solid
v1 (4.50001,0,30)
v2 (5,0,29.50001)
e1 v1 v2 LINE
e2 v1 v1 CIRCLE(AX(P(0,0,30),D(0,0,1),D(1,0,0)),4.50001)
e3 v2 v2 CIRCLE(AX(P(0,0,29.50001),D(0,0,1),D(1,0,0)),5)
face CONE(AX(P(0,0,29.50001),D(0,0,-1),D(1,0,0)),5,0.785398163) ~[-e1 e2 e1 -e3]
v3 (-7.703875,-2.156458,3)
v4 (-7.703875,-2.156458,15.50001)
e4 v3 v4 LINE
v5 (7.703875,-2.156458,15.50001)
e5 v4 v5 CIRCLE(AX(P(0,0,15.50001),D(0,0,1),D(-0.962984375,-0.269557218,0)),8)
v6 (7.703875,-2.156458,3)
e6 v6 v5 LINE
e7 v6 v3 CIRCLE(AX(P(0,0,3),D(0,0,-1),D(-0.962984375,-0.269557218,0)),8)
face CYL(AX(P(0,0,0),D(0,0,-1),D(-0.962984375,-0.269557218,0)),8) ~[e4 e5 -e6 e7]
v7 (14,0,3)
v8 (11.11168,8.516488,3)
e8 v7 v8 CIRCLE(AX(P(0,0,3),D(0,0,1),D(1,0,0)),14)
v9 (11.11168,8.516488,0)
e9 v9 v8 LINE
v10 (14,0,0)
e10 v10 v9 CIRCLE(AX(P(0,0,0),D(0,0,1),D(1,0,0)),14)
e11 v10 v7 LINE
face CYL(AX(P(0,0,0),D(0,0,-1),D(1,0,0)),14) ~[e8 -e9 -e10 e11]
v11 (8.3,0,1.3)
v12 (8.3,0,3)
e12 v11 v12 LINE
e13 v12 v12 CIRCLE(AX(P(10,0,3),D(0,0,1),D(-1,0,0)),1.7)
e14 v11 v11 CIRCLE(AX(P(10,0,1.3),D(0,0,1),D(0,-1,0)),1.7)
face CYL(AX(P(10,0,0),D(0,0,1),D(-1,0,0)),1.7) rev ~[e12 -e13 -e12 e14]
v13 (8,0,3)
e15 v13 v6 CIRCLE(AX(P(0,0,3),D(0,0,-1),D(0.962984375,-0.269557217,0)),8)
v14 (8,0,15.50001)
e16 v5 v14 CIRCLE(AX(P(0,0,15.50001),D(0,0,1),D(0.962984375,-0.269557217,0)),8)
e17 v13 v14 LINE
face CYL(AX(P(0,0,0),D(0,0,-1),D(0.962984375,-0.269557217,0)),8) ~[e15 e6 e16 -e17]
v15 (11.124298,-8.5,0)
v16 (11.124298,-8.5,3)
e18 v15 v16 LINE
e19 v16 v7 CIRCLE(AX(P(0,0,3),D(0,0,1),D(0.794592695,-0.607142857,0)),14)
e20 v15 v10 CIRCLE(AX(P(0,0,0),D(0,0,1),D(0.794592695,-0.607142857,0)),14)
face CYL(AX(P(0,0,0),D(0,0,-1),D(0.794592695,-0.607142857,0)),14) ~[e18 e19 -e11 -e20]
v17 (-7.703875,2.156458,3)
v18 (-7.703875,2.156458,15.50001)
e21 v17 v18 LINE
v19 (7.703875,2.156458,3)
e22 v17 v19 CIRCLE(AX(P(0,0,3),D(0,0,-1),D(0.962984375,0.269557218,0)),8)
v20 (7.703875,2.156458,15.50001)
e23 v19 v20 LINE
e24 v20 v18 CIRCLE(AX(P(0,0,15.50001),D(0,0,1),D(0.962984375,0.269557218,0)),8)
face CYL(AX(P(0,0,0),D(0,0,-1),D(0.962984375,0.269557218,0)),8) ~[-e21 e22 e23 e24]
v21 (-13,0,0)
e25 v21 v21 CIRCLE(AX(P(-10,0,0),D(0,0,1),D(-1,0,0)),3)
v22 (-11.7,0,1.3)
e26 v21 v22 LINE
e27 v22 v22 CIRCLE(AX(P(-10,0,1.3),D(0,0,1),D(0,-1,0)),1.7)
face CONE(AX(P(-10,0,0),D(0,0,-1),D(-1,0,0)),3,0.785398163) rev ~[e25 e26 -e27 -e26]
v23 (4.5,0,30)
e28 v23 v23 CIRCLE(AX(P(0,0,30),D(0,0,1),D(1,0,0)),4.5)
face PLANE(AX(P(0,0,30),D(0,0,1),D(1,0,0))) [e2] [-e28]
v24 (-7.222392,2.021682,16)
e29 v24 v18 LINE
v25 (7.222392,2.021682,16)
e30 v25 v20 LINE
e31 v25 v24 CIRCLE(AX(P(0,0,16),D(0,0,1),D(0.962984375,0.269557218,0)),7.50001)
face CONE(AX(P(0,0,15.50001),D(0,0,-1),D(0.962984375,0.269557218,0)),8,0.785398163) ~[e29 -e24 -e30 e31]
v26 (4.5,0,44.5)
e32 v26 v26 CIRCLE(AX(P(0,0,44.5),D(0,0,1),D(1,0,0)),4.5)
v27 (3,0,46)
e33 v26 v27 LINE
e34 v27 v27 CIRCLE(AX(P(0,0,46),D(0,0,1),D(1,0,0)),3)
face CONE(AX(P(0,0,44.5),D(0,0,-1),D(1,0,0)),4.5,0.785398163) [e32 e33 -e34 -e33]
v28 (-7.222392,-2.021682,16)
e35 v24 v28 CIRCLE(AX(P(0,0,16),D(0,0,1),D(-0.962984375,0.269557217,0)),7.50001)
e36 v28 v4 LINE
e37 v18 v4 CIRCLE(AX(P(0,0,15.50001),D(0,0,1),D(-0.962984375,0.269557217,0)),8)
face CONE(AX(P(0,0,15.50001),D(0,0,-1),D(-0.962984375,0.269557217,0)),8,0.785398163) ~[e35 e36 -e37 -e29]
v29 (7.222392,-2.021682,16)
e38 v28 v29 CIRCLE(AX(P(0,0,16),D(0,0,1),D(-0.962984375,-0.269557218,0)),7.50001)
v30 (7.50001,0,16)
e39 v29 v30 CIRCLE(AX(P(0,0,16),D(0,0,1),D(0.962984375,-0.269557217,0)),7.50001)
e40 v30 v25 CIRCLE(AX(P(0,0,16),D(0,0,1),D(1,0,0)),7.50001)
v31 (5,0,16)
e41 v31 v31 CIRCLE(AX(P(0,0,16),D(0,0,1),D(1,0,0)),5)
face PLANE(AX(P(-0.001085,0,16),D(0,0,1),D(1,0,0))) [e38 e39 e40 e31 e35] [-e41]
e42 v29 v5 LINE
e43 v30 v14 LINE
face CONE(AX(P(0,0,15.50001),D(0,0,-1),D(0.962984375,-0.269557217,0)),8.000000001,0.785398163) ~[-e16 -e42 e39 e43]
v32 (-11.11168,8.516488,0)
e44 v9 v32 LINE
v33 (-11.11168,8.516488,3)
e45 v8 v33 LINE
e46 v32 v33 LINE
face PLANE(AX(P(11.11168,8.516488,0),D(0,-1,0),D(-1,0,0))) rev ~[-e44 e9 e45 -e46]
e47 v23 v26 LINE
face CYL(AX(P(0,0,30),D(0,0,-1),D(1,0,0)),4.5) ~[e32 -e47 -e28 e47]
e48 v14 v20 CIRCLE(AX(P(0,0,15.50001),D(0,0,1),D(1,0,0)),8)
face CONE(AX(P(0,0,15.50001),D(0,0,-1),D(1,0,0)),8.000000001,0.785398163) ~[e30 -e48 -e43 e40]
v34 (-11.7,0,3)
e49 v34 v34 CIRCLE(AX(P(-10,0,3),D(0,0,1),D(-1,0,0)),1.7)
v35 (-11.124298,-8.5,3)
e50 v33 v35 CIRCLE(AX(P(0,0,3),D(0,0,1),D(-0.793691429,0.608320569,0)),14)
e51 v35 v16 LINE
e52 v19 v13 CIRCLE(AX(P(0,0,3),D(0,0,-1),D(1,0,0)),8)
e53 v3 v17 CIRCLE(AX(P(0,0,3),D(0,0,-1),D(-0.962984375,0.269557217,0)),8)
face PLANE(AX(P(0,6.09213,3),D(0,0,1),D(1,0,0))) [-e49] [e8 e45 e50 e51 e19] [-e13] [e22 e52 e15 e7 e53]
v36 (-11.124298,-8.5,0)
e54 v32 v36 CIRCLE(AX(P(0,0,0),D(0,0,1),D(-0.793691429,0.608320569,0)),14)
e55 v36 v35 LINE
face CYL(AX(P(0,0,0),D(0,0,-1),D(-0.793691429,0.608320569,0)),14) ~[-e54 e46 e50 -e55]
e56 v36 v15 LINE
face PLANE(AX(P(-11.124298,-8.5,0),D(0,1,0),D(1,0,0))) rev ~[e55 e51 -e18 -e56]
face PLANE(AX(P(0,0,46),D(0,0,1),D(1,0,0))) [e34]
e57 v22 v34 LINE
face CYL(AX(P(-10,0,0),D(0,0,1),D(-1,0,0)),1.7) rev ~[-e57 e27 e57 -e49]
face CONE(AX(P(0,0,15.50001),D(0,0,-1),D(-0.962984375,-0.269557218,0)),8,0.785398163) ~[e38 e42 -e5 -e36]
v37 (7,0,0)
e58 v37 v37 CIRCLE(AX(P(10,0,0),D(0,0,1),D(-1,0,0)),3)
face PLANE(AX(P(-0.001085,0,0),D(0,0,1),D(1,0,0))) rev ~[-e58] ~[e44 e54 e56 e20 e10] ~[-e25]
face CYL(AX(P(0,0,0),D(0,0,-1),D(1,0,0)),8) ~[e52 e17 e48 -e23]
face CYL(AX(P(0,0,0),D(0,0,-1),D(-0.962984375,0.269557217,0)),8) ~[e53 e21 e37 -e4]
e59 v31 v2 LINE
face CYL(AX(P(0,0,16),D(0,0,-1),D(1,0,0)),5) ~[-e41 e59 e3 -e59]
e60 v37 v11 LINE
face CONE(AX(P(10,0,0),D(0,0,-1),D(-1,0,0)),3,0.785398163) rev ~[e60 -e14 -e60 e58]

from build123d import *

# Parameters (mm, degrees)
F1_DEPTH        = 3
F2_DEPTH        = 16
F3_R            = 5
F4_DEPTH        = 14
F5_R            = 4.5
F6_DEPTH        = 16
F7_SIZE         = 1.5
F8_SIZE         = 0.49999
F9_D            = 3.4
F9_CSINK_D      = 6
F9_CSINK_ANGLE  = 90
F10_D           = 3.4
F10_CSINK_D     = 6
F10_CSINK_ANGLE = 90


# Not quite as in the source:
# - a fillet or chamfer is up to 0.001 mm smaller than in the source, because OpenCascade refuses the exact size


with BuildPart() as f1:
    # F0 (on Top) → F1 (new body)
    with BuildSketch(Plane.XY):
        with BuildLine():
            ThreePointArc((9.503875, 3.1106848096), (7.8523539336, 6.1919736516), (5.2411289459, 8.5164879717))
            Line((5.2411289459, 8.5164879717), (-5.2411289459, 8.5164879717))
            ThreePointArc((-5.2411289459, 8.5164879717), (-7.8523539336, 6.1919736516), (-9.503875, 3.1106848096))
            ThreePointArc((-9.503875, 3.1106848096), (-8.5246009554, 2.7831093509), (-7.703875, 2.15645774))
            ThreePointArc((-7.703875, 2.15645774), (0, 8), (7.703875, 2.15645774))
            ThreePointArc((7.703875, 2.15645774), (8.5246009554, 2.7831093509), (9.503875, 3.1106848096))
        make_face()
        with BuildLine():
            ThreePointArc((-7.703875, 2.15645774), (-8.5246009554, 2.7831093509), (-9.503875, 3.1106848096))
            ThreePointArc((-9.503875, 3.1106848096), (-9.705576078, 2.4086911373), (-9.8555, 1.6938476171))
            ThreePointArc((-9.8555, 1.6938476171), (-8.7478718117, 1.149858687), (-8.3, 0))
            ThreePointArc((-8.3, 0), (-8.7478718117, -1.149858687), (-9.8555, -1.6938476171))
            ThreePointArc((-9.8555, -1.6938476171), (-9.705576078, -2.4086911373), (-9.503875, -3.1106848096))
            ThreePointArc((-9.503875, -3.1106848096), (-8.5246009554, -2.7831093509), (-7.703875, -2.15645774))
            ThreePointArc((-7.703875, -2.15645774), (-8, 0), (-7.703875, 2.15645774))
        make_face()
        with BuildLine():
            ThreePointArc((-8.3, 0), (-8.7478718117, 1.149858687), (-9.8555, 1.6938476171))
            ThreePointArc((-9.8555, 1.6938476171), (-10, 0), (-9.8555, -1.6938476171))
            ThreePointArc((-9.8555, -1.6938476171), (-8.7478718117, -1.149858687), (-8.3, 0))
        make_face()
        with BuildLine():
            ThreePointArc((-9.8555, -1.6938476171), (-10, 0), (-9.8555, 1.6938476171))
            ThreePointArc((-9.8555, 1.6938476171), (-11.7, 0), (-9.8555, -1.6938476171))
        make_face()
        with BuildLine():
            ThreePointArc((-9.8555, 1.6938476171), (-9.705576078, 2.4086911373), (-9.503875, 3.1106848096))
            ThreePointArc((-9.503875, 3.1106848096), (-13.15, 0), (-9.503875, -3.1106848096))
            ThreePointArc((-9.503875, -3.1106848096), (-9.705576078, -2.4086911373), (-9.8555, -1.6938476171))
            ThreePointArc((-9.8555, -1.6938476171), (-11.7, 0), (-9.8555, 1.6938476171))
        make_face()
        with BuildLine():
            Line((-5.2411289459, 8.5164879717), (-11.1116800092, 8.5164879717))
            ThreePointArc((-11.1116800092, 8.5164879717), (-13.9999961512, 0.0103809935), (-11.1242977306, -8.5))
            Line((-11.1242977306, -8.5), (-5.2678268764, -8.5))
            ThreePointArc((-5.2678268764, -8.5), (-7.8620591219, -6.1796461357), (-9.503875, -3.1106848096))
            ThreePointArc((-9.503875, -3.1106848096), (-13.15, 0), (-9.503875, 3.1106848096))
            ThreePointArc((-9.503875, 3.1106848096), (-7.8523539336, 6.1919736516), (-5.2411289459, 8.5164879717))
        make_face()
        with BuildLine():
            ThreePointArc((11.1242977306, -8.5), (13.2616018683, -4.486637481), (14, 0))
            ThreePointArc((14, 0), (13.258271383, 4.4964697192), (11.1116800092, 8.5164879717))
            Line((11.1116800092, 8.5164879717), (5.2411289459, 8.5164879717))
            ThreePointArc((5.2411289459, 8.5164879717), (7.8523539336, 6.1919736516), (9.503875, 3.1106848096))
            ThreePointArc((9.503875, 3.1106848096), (12.0444689103, 2.3963820386), (13.15, 0))
            ThreePointArc((13.15, 0), (12.0444689103, -2.3963820386), (9.503875, -3.1106848096))
            ThreePointArc((9.503875, -3.1106848096), (7.8620591219, -6.1796461357), (5.2678268764, -8.5))
            Line((5.2678268764, -8.5), (11.1242977306, -8.5))
        make_face()
        with BuildLine():
            ThreePointArc((11.7, 0), (11.149858687, 1.2521281883), (9.8555, 1.6938476171))
            ThreePointArc((9.8555, 1.6938476171), (9.9638095124, 0.85), (10, 0))
            ThreePointArc((10, 0), (9.9638095124, -0.85), (9.8555, -1.6938476171))
            ThreePointArc((9.8555, -1.6938476171), (11.149858687, -1.2521281883), (11.7, 0))
        make_face()
        with BuildLine():
            ThreePointArc((13.15, 0), (12.0444689103, 2.3963820386), (9.503875, 3.1106848096))
            ThreePointArc((9.503875, 3.1106848096), (9.705576078, 2.4086911373), (9.8555, 1.6938476171))
            ThreePointArc((9.8555, 1.6938476171), (11.149858687, 1.2521281883), (11.7, 0))
            ThreePointArc((11.7, 0), (11.149858687, -1.2521281883), (9.8555, -1.6938476171))
            ThreePointArc((9.8555, -1.6938476171), (9.705576078, -2.4086911373), (9.503875, -3.1106848096))
            ThreePointArc((9.503875, -3.1106848096), (12.0444689103, -2.3963820386), (13.15, 0))
        make_face()
        with BuildLine():
            ThreePointArc((10, 0), (9.9638095124, 0.85), (9.8555, 1.6938476171))
            ThreePointArc((9.8555, 1.6938476171), (8.3, 0), (9.8555, -1.6938476171))
            ThreePointArc((9.8555, -1.6938476171), (9.9638095124, -0.85), (10, 0))
        make_face()
        with BuildLine():
            ThreePointArc((9.8555, 1.6938476171), (9.705576078, 2.4086911373), (9.503875, 3.1106848096))
            ThreePointArc((9.503875, 3.1106848096), (8.5246009554, 2.7831093509), (7.703875, 2.15645774))
            ThreePointArc((7.703875, 2.15645774), (7.9256230039, 1.088347371), (8, 0))
            ThreePointArc((8, 0), (7.9256230039, -1.088347371), (7.703875, -2.15645774))
            ThreePointArc((7.703875, -2.15645774), (8.5246009554, -2.7831093509), (9.503875, -3.1106848096))
            ThreePointArc((9.503875, -3.1106848096), (9.705576078, -2.4086911373), (9.8555, -1.6938476171))
            ThreePointArc((9.8555, -1.6938476171), (8.3, 0), (9.8555, 1.6938476171))
        make_face()
        with BuildLine():
            Line((-5.2678268764, -8.5), (5.2678268764, -8.5))
            ThreePointArc((5.2678268764, -8.5), (7.8620591219, -6.1796461357), (9.503875, -3.1106848096))
            ThreePointArc((9.503875, -3.1106848096), (8.5246009554, -2.7831093509), (7.703875, -2.15645774))
            ThreePointArc((7.703875, -2.15645774), (0, -8), (-7.703875, -2.15645774))
            ThreePointArc((-7.703875, -2.15645774), (-8.5246009554, -2.7831093509), (-9.503875, -3.1106848096))
            ThreePointArc((-9.503875, -3.1106848096), (-7.8620591219, -6.1796461357), (-5.2678268764, -8.5))
        make_face()
        with BuildLine():
            ThreePointArc((7.703875, -2.15645774), (6.85, 0), (7.703875, 2.15645774))
            ThreePointArc((7.703875, 2.15645774), (0, 8), (-7.703875, 2.15645774))
            ThreePointArc((-7.703875, 2.15645774), (-7.0712379962, 1.1596780264), (-6.85, 0))
            ThreePointArc((-6.85, 0), (-7.0712379962, -1.1596780264), (-7.703875, -2.15645774))
            ThreePointArc((-7.703875, -2.15645774), (0, -8), (7.703875, -2.15645774))
        make_face()
        with BuildLine():
            ThreePointArc((8, 0), (7.9256230039, 1.088347371), (7.703875, 2.15645774))
            ThreePointArc((7.703875, 2.15645774), (6.85, 0), (7.703875, -2.15645774))
            ThreePointArc((7.703875, -2.15645774), (7.9256230039, -1.088347371), (8, 0))
        make_face()
        with BuildLine():
            ThreePointArc((-6.85, 0), (-7.0712379962, 1.1596780264), (-7.703875, 2.15645774))
            ThreePointArc((-7.703875, 2.15645774), (-8, 0), (-7.703875, -2.15645774))
            ThreePointArc((-7.703875, -2.15645774), (-7.0712379962, -1.1596780264), (-6.85, 0))
        make_face()
    extrude(amount=F1_DEPTH)

    # F0 (on Top) → F2 (join)
    with BuildSketch(Plane.XY):
        with BuildLine():
            ThreePointArc((7.703875, -2.15645774), (6.85, 0), (7.703875, 2.15645774))
            ThreePointArc((7.703875, 2.15645774), (0, 8), (-7.703875, 2.15645774))
            ThreePointArc((-7.703875, 2.15645774), (-7.0712379962, 1.1596780264), (-6.85, 0))
            ThreePointArc((-6.85, 0), (-7.0712379962, -1.1596780264), (-7.703875, -2.15645774))
            ThreePointArc((-7.703875, -2.15645774), (0, -8), (7.703875, -2.15645774))
        make_face()
        with BuildLine():
            ThreePointArc((-6.85, 0), (-7.0712379962, 1.1596780264), (-7.703875, 2.15645774))
            ThreePointArc((-7.703875, 2.15645774), (-8, 0), (-7.703875, -2.15645774))
            ThreePointArc((-7.703875, -2.15645774), (-7.0712379962, -1.1596780264), (-6.85, 0))
        make_face()
        with BuildLine():
            ThreePointArc((8, 0), (7.9256230039, 1.088347371), (7.703875, 2.15645774))
            ThreePointArc((7.703875, 2.15645774), (6.85, 0), (7.703875, -2.15645774))
            ThreePointArc((7.703875, -2.15645774), (7.9256230039, -1.088347371), (8, 0))
        make_face()
    extrude(amount=F2_DEPTH)

    # F3 (on face) → F4 (join)
    with BuildSketch(Plane.XY.offset(16)):
        Circle(F3_R)
    extrude(amount=F4_DEPTH)

    # F5 (on face) → F6 (join)
    with BuildSketch(Plane.XY.offset(30)):
        Circle(F5_R)
    extrude(amount=F6_DEPTH)

    # F7
    f7_edges = [f1.edges().sort_by_distance(p)[0] for p in [
        (-4.5, 0, 46),
    ]]
    chamfer(f7_edges, length=F7_SIZE)

    # F8 (size 0.5 in the source; OpenCascade refuses exactly that, so slightly less here)
    f8_edges = [f1.edges().sort_by_distance(p)[0] for p in [
        (-7.703875, 2.156458, 16),
        (-5, 0, 30),
    ]]
    chamfer(f8_edges, length=F8_SIZE)

    # F9 (through all)
    with Locations(Plane(origin=(0, 0, 0), x_dir=(1, 0, 0), z_dir=(0, 0, -1))):
        with Locations((10, 0)):
            CounterSinkHole(F9_D / 2, F9_CSINK_D / 2, counter_sink_angle=F9_CSINK_ANGLE)

    # F10 (through all)
    with Locations(Plane(origin=(0, 0, 0), x_dir=(1, 0, 0), z_dir=(0, 0, -1))):
        with Locations((-10, 0)):
            CounterSinkHole(F10_D / 2, F10_CSINK_D / 2, counter_sink_angle=F10_CSINK_ANGLE)


solid = f1.part
